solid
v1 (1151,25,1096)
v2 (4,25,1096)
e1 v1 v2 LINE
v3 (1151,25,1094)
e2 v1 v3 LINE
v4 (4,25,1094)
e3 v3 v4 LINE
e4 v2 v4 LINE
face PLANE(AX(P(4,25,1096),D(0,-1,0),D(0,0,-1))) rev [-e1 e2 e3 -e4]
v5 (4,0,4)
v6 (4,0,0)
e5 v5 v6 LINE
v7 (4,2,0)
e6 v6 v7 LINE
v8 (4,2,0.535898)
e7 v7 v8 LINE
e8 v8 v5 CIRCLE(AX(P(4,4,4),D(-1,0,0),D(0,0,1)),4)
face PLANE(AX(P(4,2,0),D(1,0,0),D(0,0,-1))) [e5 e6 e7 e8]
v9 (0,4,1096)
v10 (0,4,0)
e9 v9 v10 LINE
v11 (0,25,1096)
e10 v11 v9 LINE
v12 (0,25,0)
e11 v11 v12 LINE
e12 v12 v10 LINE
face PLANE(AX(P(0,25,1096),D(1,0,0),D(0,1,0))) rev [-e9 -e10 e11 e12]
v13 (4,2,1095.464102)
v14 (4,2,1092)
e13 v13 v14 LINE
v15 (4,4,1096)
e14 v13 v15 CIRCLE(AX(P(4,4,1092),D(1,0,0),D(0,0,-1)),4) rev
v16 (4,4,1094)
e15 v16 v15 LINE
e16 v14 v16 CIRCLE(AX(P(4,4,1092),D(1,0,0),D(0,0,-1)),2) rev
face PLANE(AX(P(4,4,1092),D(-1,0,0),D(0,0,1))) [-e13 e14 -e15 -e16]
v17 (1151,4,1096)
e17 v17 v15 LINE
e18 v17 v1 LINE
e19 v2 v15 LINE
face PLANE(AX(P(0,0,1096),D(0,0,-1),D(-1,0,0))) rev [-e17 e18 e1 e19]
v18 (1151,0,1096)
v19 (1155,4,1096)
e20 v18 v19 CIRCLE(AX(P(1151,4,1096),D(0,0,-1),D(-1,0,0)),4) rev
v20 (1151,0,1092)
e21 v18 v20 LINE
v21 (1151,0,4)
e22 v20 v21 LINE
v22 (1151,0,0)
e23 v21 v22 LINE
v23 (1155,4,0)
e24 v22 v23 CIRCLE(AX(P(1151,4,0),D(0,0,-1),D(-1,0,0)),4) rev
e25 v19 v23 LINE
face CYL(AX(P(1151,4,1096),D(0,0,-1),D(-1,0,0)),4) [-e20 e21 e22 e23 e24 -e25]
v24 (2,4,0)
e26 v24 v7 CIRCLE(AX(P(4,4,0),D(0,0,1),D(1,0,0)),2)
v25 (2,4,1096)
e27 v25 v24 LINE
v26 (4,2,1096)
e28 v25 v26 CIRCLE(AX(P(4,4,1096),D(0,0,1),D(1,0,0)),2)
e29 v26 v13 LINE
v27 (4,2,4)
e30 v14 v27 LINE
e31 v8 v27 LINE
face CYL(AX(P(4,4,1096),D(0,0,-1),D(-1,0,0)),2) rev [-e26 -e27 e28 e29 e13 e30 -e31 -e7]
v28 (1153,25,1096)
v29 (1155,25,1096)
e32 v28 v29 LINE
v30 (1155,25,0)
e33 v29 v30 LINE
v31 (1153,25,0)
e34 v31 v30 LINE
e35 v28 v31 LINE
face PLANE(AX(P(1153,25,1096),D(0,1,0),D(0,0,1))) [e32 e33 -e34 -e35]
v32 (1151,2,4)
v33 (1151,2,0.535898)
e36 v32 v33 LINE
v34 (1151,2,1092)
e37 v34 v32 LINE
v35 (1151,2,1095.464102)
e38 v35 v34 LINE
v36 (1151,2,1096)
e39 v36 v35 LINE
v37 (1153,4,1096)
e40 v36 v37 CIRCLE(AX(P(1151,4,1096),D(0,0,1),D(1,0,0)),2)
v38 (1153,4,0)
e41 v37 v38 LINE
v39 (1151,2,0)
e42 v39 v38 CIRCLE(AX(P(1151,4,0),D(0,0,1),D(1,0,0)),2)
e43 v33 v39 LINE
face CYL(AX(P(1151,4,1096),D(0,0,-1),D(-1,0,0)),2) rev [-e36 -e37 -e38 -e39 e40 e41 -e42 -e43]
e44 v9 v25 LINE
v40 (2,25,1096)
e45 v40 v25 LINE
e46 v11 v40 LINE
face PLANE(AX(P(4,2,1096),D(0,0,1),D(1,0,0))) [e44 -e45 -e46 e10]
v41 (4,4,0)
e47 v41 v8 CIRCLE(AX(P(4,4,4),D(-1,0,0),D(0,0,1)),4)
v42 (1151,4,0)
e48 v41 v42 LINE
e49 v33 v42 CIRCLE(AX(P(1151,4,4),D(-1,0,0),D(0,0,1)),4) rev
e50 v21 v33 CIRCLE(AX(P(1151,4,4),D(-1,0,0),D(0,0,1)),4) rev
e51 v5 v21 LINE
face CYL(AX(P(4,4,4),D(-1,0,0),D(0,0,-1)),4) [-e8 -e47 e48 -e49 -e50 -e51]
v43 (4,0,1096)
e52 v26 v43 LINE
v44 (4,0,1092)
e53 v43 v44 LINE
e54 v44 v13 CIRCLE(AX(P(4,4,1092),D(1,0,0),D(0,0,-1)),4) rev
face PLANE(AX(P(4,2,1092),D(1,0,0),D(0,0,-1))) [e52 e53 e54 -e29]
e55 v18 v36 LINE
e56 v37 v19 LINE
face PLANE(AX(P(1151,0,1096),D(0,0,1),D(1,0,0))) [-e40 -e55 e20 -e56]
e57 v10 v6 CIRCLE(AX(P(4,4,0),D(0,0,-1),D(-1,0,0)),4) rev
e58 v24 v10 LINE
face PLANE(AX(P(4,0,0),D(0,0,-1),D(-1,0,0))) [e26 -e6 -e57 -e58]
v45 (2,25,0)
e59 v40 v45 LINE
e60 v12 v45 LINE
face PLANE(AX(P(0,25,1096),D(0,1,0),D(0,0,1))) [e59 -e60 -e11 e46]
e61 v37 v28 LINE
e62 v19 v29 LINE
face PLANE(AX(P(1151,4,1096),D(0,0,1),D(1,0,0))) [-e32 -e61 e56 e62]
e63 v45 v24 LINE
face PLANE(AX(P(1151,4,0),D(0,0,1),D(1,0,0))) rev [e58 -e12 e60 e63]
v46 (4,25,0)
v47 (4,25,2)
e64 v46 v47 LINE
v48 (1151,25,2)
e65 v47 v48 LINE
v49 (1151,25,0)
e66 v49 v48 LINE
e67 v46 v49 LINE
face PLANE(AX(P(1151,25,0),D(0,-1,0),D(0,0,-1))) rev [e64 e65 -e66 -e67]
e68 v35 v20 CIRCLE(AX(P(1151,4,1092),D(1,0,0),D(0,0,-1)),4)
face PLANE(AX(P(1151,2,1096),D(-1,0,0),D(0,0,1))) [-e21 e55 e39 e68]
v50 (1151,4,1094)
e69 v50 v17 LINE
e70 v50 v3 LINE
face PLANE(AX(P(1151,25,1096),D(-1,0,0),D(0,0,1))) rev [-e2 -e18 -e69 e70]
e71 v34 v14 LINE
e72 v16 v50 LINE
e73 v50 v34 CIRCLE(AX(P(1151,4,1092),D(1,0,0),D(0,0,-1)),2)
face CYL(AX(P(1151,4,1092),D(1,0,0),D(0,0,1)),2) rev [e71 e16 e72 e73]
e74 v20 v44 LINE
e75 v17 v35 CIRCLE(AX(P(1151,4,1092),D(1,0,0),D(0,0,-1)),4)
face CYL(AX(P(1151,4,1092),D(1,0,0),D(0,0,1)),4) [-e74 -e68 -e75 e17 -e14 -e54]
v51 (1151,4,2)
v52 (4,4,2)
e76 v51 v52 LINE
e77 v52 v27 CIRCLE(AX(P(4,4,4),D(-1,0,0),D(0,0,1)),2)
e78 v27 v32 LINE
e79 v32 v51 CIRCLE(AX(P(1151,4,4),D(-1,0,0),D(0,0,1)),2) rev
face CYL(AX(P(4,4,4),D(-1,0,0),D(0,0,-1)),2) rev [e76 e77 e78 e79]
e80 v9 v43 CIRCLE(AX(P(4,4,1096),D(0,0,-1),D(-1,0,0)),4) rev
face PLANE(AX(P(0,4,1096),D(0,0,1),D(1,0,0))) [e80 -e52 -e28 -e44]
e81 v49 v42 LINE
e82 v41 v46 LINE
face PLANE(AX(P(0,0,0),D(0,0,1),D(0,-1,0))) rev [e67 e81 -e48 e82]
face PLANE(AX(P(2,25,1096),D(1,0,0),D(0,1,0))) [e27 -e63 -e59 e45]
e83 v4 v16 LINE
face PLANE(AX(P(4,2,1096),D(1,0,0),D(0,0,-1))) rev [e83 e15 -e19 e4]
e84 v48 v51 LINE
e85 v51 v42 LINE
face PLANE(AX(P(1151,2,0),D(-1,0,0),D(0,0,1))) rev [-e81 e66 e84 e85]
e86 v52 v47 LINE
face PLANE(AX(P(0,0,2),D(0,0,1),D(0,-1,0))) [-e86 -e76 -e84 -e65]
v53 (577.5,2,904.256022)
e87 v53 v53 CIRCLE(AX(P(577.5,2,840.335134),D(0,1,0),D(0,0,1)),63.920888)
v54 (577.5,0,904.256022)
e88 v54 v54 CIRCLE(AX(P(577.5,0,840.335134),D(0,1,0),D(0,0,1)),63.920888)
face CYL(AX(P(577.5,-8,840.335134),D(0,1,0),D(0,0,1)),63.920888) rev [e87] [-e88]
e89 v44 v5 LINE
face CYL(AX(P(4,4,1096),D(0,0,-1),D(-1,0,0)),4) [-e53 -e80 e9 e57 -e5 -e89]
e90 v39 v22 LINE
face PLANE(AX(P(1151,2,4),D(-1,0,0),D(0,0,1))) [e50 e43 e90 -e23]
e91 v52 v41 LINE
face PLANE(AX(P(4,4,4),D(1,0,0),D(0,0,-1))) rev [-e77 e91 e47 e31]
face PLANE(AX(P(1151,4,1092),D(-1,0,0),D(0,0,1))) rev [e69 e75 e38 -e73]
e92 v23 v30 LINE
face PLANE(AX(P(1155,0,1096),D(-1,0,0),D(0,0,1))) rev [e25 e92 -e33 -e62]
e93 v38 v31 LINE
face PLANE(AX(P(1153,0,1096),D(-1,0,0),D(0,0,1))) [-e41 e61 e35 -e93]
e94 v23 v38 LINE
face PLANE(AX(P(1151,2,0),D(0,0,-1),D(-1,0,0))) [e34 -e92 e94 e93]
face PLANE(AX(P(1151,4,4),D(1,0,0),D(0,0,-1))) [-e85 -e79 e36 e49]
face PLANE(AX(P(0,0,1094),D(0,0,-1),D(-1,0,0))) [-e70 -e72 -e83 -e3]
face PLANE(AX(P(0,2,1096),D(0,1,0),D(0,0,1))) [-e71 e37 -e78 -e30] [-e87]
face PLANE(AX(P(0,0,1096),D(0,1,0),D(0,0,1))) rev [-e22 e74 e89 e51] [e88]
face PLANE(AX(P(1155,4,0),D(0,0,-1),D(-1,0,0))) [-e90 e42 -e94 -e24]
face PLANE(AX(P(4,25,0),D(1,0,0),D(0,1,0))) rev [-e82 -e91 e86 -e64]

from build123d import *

# Parameters (mm, degrees)
BASE_FLANGE1_DEPTH             = 1096
EDGE_FLANGE1_STRIP_W           = 12
EDGE_FLANGE1_STRIP_H           = 2
EDGE_FLANGE1_STRIP_CUT_DEPTH   = 1147
EDGE_FLANGE1_STRIP_2_W         = 12
EDGE_FLANGE1_STRIP_2_H         = 2
EDGE_FLANGE1_STRIP_CUT_2_DEPTH = 1147
EDGE_FLANGE1_DEPTH             = 1147
EDGE_FLANGE1_BEND_DEPTH        = 1147
SKETCH12_R                     = 63.920888045
CUT_EXTRUDE1_DEPTH             = 10


# Sheet-metal steps are written as plain solids
with BuildPart() as part:
    # Sketch1 → Base-Flange1 (new body)
    with BuildSketch(Plane.XY):
        with BuildLine():
            Line((0, 25), (0, 4))
            ThreePointArc((0, 4), (1.171572875, 1.171572875), (4, 0))
            Line((4, 0), (1151, 0))
            ThreePointArc((1151, 0), (1153.828427125, 1.171572875), (1155, 4))
            Line((1155, 4), (1155, 25))
            Line((1155, 25), (1153, 25))
            Line((1153, 25), (1153, 4))
            ThreePointArc((1153, 4), (1152.414213562, 2.585786438), (1151, 2))
            Line((1151, 2), (4, 2))
            ThreePointArc((4, 2), (2.585786438, 2.585786438), (2, 4))
            Line((2, 4), (2, 25))
            Line((2, 25), (0, 25))
        make_face()
    extrude(amount=BASE_FLANGE1_DEPTH)

    # Edge-Flange1 strip (across the edge) → Edge-Flange1 strip cut (cut)
    with BuildSketch(Plane(origin=(4, 2, 1096), x_dir=(0, 0, -1), z_dir=(1, 0, 0))):
        with Locations((-2, -1)):
            Rectangle(EDGE_FLANGE1_STRIP_W, EDGE_FLANGE1_STRIP_H)
    extrude(amount=EDGE_FLANGE1_STRIP_CUT_DEPTH, mode=Mode.SUBTRACT)

    # Edge-Flange1 strip 2 (across the edge) → Edge-Flange1 strip cut 2 (cut)
    with BuildSketch(Plane(origin=(1151, 2, 0), x_dir=(0, 0, 1), z_dir=(-1, 0, 0))):
        with Locations((-2, -1)):
            Rectangle(EDGE_FLANGE1_STRIP_2_W, EDGE_FLANGE1_STRIP_2_H)
    extrude(amount=EDGE_FLANGE1_STRIP_CUT_2_DEPTH, mode=Mode.SUBTRACT)

    # Edge-Flange1 section (across the edge) → Edge-Flange1 (add)
    with BuildSketch(Plane(origin=(4, 2, 1096), x_dir=(0, 0, -1), z_dir=(1, 0, 0))):
        with BuildLine():
            Line((0, 2), (0, 23))
            Line((0, 23), (2, 23))
            Line((2, 23), (2, 2))
            ThreePointArc((2, 2), (2.585786438, 0.585786438), (4, 0))
            Line((4, 0), (4, -2))
            ThreePointArc((4, -2), (1.171572875, -0.828427125), (0, 2))
        make_face()
    extrude(amount=EDGE_FLANGE1_DEPTH)

    # Edge-Flange1 section 2 (across the edge) → Edge-Flange1 bend (add)
    with BuildSketch(Plane(origin=(1151, 2, 0), x_dir=(0, 0, 1), z_dir=(-1, 0, 0))):
        with BuildLine():
            Line((0, 2), (0, 23))
            Line((0, 23), (2, 23))
            Line((2, 23), (2, 2))
            ThreePointArc((2, 2), (2.585786438, 0.585786438), (4, 0))
            Line((4, 0), (4, -2))
            ThreePointArc((4, -2), (1.171572875, -0.828427125), (0, 2))
        make_face()
    extrude(amount=EDGE_FLANGE1_BEND_DEPTH)

    # Sketch12 → Cut-Extrude1 (cut)
    with BuildSketch(Plane(origin=(0, 2, 0), x_dir=(1, 0, 0), z_dir=(0, 1, 0))):
        with Locations(Location((577.5, -840.335133885, 0), (0, 0, 270))):
            Circle(SKETCH12_R)
    extrude(amount=-CUT_EXTRUDE1_DEPTH, mode=Mode.SUBTRACT)


solid = part.part
